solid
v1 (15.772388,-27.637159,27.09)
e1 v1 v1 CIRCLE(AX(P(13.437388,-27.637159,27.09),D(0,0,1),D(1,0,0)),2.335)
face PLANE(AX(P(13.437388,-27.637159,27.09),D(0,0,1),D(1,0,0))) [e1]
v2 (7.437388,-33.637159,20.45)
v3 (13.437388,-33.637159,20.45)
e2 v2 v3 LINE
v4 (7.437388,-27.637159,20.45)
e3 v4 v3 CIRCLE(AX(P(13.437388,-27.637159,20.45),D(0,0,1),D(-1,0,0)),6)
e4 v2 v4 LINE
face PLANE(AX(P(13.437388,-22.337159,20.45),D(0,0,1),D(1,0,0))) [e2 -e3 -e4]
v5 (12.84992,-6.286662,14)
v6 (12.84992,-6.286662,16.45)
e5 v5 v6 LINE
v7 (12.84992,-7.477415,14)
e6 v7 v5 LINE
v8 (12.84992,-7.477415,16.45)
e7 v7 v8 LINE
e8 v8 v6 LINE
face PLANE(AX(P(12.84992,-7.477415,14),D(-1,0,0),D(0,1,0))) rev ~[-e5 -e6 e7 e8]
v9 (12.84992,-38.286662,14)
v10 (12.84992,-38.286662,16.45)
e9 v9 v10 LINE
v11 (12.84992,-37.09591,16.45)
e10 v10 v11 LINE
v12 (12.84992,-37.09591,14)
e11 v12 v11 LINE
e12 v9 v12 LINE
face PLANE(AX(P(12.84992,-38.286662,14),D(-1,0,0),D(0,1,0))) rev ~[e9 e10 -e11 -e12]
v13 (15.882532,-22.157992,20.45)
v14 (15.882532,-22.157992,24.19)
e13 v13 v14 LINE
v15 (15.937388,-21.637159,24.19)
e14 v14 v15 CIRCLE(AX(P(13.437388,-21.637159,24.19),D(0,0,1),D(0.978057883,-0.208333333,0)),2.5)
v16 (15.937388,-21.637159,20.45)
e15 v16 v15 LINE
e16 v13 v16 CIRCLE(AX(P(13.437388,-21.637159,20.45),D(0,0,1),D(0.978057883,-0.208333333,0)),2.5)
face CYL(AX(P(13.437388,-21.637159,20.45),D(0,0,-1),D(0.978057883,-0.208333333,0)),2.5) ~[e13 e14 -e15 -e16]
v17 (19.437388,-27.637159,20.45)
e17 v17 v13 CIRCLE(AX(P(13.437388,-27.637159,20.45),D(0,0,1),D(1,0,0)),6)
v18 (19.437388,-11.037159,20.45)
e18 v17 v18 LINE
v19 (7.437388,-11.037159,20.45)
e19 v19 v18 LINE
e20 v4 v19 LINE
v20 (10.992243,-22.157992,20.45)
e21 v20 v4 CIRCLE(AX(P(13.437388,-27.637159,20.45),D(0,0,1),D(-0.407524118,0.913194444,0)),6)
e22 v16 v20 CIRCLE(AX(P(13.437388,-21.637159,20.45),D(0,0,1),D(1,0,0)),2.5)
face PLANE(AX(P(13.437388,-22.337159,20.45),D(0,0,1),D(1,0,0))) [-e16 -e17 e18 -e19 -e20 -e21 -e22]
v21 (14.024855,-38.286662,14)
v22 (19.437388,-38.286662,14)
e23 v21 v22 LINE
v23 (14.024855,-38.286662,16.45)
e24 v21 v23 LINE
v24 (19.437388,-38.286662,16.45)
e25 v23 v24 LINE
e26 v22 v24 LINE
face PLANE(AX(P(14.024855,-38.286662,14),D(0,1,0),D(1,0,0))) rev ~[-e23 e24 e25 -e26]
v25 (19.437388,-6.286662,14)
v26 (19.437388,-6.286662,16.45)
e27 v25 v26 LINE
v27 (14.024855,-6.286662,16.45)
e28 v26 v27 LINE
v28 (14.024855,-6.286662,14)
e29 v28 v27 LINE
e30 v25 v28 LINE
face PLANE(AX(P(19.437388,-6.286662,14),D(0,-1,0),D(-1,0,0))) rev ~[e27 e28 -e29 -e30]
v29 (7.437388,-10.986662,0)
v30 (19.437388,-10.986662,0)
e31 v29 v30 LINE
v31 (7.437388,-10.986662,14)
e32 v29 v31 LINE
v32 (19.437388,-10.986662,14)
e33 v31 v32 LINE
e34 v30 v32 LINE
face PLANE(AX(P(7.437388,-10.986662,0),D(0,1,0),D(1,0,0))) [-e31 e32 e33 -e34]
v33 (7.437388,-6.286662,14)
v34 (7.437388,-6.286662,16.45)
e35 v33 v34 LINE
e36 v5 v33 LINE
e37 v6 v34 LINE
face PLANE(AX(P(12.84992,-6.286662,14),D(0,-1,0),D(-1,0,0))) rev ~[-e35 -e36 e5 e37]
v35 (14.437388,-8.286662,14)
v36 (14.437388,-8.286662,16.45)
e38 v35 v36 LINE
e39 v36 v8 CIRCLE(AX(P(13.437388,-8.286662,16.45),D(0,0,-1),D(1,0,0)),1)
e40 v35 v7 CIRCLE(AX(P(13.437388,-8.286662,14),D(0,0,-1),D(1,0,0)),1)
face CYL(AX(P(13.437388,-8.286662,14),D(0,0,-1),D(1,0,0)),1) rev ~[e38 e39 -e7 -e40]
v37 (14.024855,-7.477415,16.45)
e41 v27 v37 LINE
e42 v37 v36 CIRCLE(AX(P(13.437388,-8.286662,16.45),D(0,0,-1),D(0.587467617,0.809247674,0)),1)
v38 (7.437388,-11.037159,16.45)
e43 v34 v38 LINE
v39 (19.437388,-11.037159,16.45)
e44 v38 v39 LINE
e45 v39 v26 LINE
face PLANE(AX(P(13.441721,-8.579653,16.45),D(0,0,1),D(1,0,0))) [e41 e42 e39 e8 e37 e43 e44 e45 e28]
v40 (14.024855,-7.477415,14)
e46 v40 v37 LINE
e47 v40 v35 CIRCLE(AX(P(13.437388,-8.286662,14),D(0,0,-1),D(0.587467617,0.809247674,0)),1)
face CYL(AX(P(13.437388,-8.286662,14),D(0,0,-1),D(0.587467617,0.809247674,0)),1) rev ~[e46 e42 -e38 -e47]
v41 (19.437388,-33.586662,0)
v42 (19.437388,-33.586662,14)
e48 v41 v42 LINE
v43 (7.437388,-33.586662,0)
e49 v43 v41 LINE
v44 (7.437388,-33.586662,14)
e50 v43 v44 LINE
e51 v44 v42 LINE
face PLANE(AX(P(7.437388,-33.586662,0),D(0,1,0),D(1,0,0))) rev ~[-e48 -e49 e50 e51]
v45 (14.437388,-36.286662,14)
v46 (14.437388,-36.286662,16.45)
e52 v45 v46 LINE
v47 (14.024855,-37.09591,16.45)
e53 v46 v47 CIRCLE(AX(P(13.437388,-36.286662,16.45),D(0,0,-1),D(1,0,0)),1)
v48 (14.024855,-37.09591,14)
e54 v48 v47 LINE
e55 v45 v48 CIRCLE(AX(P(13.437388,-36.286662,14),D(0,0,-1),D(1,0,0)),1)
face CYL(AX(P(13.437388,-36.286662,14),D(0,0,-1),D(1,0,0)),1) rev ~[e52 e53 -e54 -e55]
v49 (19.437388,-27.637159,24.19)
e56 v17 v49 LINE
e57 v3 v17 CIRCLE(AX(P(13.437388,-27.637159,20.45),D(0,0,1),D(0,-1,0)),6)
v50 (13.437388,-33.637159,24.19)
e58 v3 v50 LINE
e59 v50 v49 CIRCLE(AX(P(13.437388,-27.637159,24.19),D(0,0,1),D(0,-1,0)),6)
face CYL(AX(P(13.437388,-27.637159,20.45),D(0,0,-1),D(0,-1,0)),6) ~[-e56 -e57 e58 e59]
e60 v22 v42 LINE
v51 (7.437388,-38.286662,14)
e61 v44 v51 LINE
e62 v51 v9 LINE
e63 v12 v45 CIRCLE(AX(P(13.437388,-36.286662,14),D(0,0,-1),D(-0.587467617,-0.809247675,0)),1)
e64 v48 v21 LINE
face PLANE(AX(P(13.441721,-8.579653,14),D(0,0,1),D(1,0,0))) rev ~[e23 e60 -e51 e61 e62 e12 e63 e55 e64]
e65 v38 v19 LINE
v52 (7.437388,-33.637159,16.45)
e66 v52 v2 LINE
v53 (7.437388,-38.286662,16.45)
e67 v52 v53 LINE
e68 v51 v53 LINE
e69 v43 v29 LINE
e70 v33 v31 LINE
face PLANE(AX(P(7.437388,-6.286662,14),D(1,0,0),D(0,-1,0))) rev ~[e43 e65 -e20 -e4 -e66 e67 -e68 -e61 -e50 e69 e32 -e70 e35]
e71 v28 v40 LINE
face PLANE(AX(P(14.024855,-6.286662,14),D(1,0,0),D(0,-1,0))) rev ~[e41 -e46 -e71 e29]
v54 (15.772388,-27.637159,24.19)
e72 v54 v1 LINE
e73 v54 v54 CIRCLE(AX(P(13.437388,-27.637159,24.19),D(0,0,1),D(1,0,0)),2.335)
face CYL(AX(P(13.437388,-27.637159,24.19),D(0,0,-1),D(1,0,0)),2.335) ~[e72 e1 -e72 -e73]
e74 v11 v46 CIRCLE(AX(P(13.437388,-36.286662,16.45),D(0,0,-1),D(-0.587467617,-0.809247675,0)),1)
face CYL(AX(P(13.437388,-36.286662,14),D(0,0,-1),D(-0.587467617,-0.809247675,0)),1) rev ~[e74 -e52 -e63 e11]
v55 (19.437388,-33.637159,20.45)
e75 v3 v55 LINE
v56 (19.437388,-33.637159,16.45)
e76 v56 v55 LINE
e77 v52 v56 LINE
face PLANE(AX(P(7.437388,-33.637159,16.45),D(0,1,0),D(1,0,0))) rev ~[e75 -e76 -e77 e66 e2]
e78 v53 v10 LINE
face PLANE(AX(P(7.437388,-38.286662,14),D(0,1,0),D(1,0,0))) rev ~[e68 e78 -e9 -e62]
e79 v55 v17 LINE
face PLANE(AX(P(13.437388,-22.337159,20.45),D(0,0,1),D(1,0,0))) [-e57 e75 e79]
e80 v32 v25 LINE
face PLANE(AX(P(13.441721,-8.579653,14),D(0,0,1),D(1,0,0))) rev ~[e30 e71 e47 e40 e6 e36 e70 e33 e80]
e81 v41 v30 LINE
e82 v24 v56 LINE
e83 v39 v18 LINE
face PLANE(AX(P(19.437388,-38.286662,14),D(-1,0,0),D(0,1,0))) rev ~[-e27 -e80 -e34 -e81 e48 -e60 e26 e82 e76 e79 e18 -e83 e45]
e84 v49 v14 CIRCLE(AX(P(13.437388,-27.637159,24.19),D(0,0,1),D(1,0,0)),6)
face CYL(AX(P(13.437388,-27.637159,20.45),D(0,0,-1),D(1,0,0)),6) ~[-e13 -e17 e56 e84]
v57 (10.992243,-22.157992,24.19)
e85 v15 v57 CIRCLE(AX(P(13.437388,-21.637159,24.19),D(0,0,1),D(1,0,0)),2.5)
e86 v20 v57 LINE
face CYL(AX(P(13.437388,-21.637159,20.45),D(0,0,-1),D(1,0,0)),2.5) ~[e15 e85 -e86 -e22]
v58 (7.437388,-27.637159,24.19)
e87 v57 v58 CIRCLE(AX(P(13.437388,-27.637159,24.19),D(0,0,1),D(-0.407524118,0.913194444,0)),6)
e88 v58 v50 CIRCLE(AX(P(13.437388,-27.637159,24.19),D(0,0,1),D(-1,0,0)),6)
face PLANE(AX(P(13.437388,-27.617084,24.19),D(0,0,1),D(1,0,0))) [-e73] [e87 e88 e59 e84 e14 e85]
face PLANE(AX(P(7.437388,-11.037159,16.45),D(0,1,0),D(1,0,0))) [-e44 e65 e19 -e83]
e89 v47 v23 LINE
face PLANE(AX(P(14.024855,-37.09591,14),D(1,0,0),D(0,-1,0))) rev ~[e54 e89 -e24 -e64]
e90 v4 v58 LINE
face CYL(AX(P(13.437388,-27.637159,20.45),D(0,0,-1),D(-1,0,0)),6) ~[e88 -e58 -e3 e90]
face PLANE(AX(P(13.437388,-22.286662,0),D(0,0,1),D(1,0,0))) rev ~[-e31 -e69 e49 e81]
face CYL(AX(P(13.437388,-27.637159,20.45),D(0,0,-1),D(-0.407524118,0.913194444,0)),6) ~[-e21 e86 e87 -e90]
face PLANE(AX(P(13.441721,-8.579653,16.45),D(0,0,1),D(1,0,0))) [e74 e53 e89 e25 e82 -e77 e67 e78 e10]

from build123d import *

# Parameters (mm, degrees)
F0_W     = 12
F0_H     = 22.6
F1_DEPTH = 14
F2_W     = 12
F2_H     = 22.6
F3_DEPTH = 2.45
F4_W     = 12
F4_H     = 22.6
F5_DEPTH = 4
F7_DEPTH = 3.74
F8_R     = 2.335
F9_DEPTH = 2.9


# Not quite as in the source:
# - a feature names something its author has since deleted; it is built from what else it names


with BuildPart() as f1:
    # F0 (on Top) → F1 (new body)
    with BuildSketch(Plane.XY):
        with Locations((13.4373875856, -22.2866622627)):
            Rectangle(F0_W, F0_H)
    extrude(amount=F1_DEPTH)

    # F2 (on face) → F3 (join)
    with BuildSketch(Plane.XY.offset(14)):
        with BuildLine():
            Line((7.4373875856, -10.9866622627), (19.4373875856, -10.9866622627))
            Line((19.4373875856, -10.9866622627), (19.4373875856, -6.2866622627))
            Line((19.4373875856, -6.2866622627), (14.0248552029, -6.2866622627))
            Line((14.0248552029, -6.2866622627), (14.0248552029, -7.4774145882))
            ThreePointArc((14.0248552029, -7.4774145882), (14.3283049828, -7.8324968838), (14.4373875856, -8.2866622627))
            ThreePointArc((14.4373875856, -8.2866622627), (12.9832222068, -9.1775796599), (12.8499199684, -7.4774145882))
            Line((12.8499199684, -7.4774145882), (12.8499199684, -6.2866622627))
            Line((12.8499199684, -6.2866622627), (7.4373875856, -6.2866622627))
            Line((7.4373875856, -6.2866622627), (7.4373875856, -10.9866622627))
        make_face()
        with BuildLine():
            Line((19.4373875856, -38.2866622627), (19.4373875856, -33.5866622627))
            Line((19.4373875856, -33.5866622627), (7.4373875856, -33.5866622627))
            Line((7.4373875856, -33.5866622627), (7.4373875856, -38.2866622627))
            Line((7.4373875856, -38.2866622627), (12.8499199684, -38.2866622627))
            Line((12.8499199684, -38.2866622627), (12.8499199684, -37.0959099372))
            ThreePointArc((12.8499199684, -37.0959099372), (12.9832222068, -35.3957448655), (14.4373875856, -36.2866622627))
            ThreePointArc((14.4373875856, -36.2866622627), (14.3283049828, -36.7408276416), (14.0248552029, -37.0959099372))
            Line((14.0248552029, -37.0959099372), (14.0248552029, -38.2866622627))
            Line((14.0248552029, -38.2866622627), (19.4373875856, -38.2866622627))
        make_face()
        with Locations((13.4373875856, -22.2866622627)):
            Rectangle(F2_W, F2_H)
    extrude(amount=F3_DEPTH)

    # F4 (on face) → F5 (join)
    with BuildSketch(Plane.XY.offset(16.45)):
        with Locations((13.4373875856, -22.3371585727)):
            Rectangle(F4_W, F4_H)
    extrude(amount=F5_DEPTH)

    # F6 (on face) → F7 (join)
    with BuildSketch(Plane.XY.offset(20.45)):
        with BuildLine():
            ThreePointArc((13.4373875856, -33.6371585727), (17.6800282728, -31.8797992598), (19.4373875856, -27.6371585727))
            ThreePointArc((19.4373875856, -27.6371585727), (18.4708192303, -24.371493881), (15.8825322928, -22.157991906))
            ThreePointArc((15.8825322928, -22.157991906), (13.4373875856, -24.1371585727), (10.9922428785, -22.157991906))
            ThreePointArc((10.9922428785, -22.157991906), (8.403955941, -24.371493881), (7.4373875856, -27.6371585727))
            ThreePointArc((7.4373875856, -27.6371585727), (9.1947468985, -31.8797992598), (13.4373875856, -33.6371585727))
        make_face()
        with BuildLine():
            ThreePointArc((10.9922428785, -22.157991906), (13.4373875856, -24.1371585727), (15.8825322928, -22.157991906))
            ThreePointArc((15.8825322928, -22.157991906), (13.4373875856, -21.6371585727), (10.9922428785, -22.157991906))
        make_face()
        with BuildLine():
            ThreePointArc((10.9922428785, -22.157991906), (13.4373875856, -21.6371585727), (15.8825322928, -22.157991906))
            ThreePointArc((15.8825322928, -22.157991906), (15.9236359409, -21.8990156254), (15.9373875856, -21.6371585727))
            ThreePointArc((15.9373875856, -21.6371585727), (13.1755305329, -19.1509102174), (10.9922428785, -22.157991906))
        make_face()
    extrude(amount=F7_DEPTH)

    # F8 (on face) → F9 (join)
    with BuildSketch(Plane.XY.offset(24.19)):
        with Locations((13.4373875856, -27.6371585727)):
            Circle(F8_R)
    extrude(amount=F9_DEPTH)


solid = f1.part
